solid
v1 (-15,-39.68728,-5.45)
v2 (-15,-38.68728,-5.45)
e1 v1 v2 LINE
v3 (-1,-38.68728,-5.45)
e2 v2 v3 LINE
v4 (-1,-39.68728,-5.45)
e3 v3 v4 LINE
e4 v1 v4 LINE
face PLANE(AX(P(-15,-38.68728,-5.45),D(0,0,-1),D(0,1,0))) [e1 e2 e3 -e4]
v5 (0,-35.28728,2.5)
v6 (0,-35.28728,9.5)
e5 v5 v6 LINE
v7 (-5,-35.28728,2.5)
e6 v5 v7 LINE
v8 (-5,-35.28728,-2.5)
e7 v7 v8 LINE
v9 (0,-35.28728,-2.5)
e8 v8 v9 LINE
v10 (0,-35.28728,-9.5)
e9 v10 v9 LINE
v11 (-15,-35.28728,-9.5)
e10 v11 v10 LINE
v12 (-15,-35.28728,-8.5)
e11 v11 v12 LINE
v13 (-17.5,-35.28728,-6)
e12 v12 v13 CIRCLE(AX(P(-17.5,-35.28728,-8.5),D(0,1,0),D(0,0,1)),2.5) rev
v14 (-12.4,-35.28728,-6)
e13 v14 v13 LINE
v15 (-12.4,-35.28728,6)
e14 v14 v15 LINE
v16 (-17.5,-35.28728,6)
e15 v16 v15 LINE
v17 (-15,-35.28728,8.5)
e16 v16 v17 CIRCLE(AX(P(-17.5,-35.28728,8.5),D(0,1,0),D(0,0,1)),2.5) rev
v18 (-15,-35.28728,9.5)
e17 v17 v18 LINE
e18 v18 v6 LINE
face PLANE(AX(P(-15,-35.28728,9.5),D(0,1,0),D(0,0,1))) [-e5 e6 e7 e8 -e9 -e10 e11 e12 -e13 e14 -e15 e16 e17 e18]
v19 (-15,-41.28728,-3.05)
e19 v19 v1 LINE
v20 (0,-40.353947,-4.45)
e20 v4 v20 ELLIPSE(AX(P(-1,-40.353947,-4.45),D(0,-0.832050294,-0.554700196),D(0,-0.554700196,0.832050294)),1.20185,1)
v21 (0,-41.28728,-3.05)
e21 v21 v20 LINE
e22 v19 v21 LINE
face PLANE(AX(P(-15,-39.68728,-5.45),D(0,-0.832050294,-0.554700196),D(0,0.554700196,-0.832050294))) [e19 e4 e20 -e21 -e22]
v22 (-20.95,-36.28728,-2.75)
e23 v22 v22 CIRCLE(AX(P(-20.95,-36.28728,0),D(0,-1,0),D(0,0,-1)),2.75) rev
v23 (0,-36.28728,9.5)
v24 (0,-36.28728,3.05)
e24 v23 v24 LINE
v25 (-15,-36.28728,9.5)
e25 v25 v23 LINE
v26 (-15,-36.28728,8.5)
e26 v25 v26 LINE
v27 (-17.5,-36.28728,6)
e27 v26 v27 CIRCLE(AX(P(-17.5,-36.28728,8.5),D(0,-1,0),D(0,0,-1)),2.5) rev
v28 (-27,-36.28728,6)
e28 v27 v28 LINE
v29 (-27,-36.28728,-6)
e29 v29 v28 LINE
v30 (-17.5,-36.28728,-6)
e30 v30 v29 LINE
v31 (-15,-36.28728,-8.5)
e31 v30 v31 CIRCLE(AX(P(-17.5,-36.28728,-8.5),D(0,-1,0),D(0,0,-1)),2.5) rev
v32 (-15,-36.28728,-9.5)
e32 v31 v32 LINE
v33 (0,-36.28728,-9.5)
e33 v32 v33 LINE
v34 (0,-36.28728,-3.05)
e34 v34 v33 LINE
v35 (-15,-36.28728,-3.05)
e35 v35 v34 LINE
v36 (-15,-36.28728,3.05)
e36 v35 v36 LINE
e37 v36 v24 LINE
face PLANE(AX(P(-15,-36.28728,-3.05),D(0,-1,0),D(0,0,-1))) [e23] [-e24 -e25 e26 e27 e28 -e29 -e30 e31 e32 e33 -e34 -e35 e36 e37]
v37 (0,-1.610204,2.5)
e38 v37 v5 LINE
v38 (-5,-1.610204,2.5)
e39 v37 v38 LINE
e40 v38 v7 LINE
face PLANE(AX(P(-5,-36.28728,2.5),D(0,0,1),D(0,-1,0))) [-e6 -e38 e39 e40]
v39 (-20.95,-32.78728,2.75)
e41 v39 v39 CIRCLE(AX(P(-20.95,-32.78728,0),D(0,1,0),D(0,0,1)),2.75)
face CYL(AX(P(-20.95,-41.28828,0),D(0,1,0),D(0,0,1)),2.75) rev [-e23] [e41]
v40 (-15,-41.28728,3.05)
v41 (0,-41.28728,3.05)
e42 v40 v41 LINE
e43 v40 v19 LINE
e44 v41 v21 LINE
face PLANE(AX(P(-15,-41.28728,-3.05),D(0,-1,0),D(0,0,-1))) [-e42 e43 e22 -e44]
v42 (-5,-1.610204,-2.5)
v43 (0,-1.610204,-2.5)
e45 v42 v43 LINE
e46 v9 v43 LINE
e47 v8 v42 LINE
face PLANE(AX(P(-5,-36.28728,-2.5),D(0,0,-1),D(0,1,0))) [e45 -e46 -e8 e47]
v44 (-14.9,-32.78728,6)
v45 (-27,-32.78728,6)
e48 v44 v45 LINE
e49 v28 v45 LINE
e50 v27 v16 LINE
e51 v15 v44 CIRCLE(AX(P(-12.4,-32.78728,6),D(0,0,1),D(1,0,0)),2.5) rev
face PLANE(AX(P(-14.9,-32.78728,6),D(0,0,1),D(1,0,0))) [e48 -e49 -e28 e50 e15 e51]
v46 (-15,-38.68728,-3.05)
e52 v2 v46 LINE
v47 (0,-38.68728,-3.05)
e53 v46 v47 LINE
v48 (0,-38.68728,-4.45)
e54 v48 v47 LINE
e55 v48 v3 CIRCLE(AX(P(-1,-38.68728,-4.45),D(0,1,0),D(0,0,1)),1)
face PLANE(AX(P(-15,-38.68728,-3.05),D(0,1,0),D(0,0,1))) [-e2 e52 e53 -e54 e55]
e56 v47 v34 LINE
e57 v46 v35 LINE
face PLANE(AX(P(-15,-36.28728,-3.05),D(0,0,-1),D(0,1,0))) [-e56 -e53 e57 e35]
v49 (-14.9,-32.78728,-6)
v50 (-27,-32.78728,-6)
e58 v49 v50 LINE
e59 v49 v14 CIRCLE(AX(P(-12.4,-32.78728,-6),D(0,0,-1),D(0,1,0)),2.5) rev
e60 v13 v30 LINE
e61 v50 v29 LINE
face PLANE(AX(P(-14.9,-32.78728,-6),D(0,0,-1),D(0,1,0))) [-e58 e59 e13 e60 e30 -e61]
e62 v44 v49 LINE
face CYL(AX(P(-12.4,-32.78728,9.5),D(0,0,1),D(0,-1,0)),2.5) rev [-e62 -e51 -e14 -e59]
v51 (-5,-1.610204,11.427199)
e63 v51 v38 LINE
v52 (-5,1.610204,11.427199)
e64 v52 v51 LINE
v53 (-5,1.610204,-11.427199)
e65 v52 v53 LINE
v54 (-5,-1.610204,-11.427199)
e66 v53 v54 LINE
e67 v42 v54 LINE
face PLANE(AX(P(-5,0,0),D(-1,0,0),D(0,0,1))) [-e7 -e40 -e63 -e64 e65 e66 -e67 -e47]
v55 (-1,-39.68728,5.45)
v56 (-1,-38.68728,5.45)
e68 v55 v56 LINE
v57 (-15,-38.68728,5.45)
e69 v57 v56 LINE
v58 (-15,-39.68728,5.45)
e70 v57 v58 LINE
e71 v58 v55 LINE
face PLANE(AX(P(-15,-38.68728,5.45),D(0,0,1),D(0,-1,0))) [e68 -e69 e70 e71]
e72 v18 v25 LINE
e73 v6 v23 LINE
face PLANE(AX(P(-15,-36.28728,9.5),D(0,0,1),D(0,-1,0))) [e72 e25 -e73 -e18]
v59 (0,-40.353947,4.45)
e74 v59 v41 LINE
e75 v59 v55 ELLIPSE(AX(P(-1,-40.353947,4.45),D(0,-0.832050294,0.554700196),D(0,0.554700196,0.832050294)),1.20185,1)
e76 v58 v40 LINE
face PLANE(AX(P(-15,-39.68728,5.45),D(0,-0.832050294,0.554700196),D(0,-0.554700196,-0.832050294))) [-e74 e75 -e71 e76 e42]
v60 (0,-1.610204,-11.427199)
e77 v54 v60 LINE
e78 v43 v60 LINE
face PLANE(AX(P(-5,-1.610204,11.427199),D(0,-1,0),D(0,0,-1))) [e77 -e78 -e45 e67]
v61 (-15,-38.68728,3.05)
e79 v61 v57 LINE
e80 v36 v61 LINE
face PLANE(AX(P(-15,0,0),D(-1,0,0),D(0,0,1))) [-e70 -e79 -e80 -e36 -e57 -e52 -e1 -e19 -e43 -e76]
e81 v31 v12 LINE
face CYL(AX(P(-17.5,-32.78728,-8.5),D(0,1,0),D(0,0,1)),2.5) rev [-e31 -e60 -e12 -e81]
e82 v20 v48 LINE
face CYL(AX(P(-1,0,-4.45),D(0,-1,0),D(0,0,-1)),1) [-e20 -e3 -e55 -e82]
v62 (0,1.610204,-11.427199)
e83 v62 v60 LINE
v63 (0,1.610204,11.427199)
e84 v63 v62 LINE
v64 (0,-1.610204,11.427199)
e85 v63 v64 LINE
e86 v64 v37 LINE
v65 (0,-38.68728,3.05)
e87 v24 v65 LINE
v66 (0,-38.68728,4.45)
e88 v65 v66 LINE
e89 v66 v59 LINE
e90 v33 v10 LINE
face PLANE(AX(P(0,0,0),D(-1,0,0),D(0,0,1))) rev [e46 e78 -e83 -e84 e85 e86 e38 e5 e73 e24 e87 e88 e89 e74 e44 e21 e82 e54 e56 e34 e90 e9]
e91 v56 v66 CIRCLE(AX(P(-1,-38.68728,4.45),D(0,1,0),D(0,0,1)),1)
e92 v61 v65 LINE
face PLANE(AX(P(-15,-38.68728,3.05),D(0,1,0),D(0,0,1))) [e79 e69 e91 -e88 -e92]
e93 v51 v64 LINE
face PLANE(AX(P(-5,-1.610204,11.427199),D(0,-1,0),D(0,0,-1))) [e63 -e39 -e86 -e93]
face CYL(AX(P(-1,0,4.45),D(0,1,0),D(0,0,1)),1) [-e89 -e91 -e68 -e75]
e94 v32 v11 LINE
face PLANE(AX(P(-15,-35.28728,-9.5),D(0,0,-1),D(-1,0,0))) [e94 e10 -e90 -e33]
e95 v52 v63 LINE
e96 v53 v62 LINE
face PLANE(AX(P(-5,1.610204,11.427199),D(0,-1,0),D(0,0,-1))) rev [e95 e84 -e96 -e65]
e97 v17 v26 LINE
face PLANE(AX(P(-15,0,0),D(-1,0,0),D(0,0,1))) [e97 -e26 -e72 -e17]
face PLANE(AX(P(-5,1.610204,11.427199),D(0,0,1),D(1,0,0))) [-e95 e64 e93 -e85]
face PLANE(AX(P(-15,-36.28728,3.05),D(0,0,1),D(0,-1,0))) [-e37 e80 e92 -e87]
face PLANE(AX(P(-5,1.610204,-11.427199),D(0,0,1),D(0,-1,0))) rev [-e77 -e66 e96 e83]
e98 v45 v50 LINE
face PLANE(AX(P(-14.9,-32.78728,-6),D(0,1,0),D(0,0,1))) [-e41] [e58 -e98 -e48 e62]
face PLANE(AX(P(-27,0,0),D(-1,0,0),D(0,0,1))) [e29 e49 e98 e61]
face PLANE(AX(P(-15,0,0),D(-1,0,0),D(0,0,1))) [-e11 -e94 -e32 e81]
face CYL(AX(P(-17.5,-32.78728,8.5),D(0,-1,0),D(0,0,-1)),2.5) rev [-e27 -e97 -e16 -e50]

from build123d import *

# Parameters (mm, degrees)
SKETCH1_W                 = 22.85439833
SKETCH1_H                 = 3.220407414
BOSS_EXTRUDE1_DEPTH       = 5
SKETCH2_W                 = 5
SKETCH2_H                 = 37.897484117
BOSS_EXTRUDE2_DEPTH       = 5
BOSS_EXTRUDE3_DEPTH       = 15
FILLET1_R                 = 1
BOSS_EXTRUDE28_DEPTH      = 12
BOSS_EXTRUDE28_DEPTH_BACK = 0.1
SKETCH38_W                = 12
SKETCH38_H                = 3.5
CUT_EXTRUDE3_REACH        = 47.197
SKETCH39_R                = 2.75
FILLET2_R                 = 2.5


with BuildPart() as part:
    # Sketch1 → Boss-Extrude1 (new body)
    with BuildSketch(Plane(origin=(0, 0, 0), x_dir=(0, 0, -1), z_dir=(1, 0, 0))):
        Rectangle(SKETCH1_W, SKETCH1_H)
    extrude(amount=-BOSS_EXTRUDE1_DEPTH)

    # Sketch2 → Boss-Extrude2 (add)
    with BuildSketch(Plane(origin=(0, 0, 0), x_dir=(0, 0, -1), z_dir=(1, 0, 0))):
        with Locations((0, -17.338538351)):
            Rectangle(SKETCH2_W, SKETCH2_H)
    extrude(amount=-BOSS_EXTRUDE2_DEPTH)

    # Sketch3 → Boss-Extrude3 (add)
    with BuildSketch(Plane(origin=(0, 0, 0), x_dir=(0, 0, -1), z_dir=(1, 0, 0))):
        Polygon((-9.5, -36.28728041), (-9.5, -35.28728041), (9.5, -35.28728041), (9.5, -36.28728041), (3.05, -36.28728041), (3.05, -38.68728041), (5.45, -38.68728041), (5.45, -39.68728041), (3.05, -41.28728041), (-3.05, -41.28728041), (-5.45, -39.68728041), (-5.45, -38.68728041), (-3.05, -38.68728041), (-3.05, -36.28728041), align=None)
    extrude(amount=-BOSS_EXTRUDE3_DEPTH)

    # Fillet1
    fillet1_edges = [part.edges().sort_by_distance(p)[0] for p in [
        (0, -39.18728041, 5.45),
        (0, -39.18728041, -5.45),
    ]]
    fillet(fillet1_edges, radius=FILLET1_R)

    # Sketch38 → Boss-Extrude28 (add, two sides: drawn at the far end of the back side and taken through both)
    with BuildSketch(Plane.ZY.offset(15).offset(-BOSS_EXTRUDE28_DEPTH_BACK)):
        with Locations((0, -34.53728041)):
            Rectangle(SKETCH38_W, SKETCH38_H)
    extrude(amount=BOSS_EXTRUDE28_DEPTH + BOSS_EXTRUDE28_DEPTH_BACK)

    # Sketch39 → Cut-Extrude3 (cut, up to next)
    with BuildSketch(Plane(origin=(0, -32.78728041, 0), x_dir=(1, 0, 0), z_dir=(0, 1, 0)), mode=Mode.PRIVATE) as cut_extrude3_sk1:
        with Locations(Location((-20.95, 0, 0), (0, 0, 270))):
            Circle(SKETCH39_R)
    cut_extrude3_tool1 = extrude(cut_extrude3_sk1.sketch, amount=-CUT_EXTRUDE3_REACH, mode=Mode.PRIVATE) & part.part
    add(cut_extrude3_tool1.solids().sort_by_distance((-20.95, -32.78728, 0))[0], mode=Mode.SUBTRACT)

    # Fillet2
    fillet2_edges = [part.edges().sort_by_distance(p)[0] for p in [
        (-14.9, -35.28728041, 0),
        (-15, -35.78728041, -6),
        (-15, -35.78728041, 6),
    ]]
    fillet(fillet2_edges, radius=FILLET2_R - 0.0001)  # a hair under: the kernel refuses the full size


solid = part.part
